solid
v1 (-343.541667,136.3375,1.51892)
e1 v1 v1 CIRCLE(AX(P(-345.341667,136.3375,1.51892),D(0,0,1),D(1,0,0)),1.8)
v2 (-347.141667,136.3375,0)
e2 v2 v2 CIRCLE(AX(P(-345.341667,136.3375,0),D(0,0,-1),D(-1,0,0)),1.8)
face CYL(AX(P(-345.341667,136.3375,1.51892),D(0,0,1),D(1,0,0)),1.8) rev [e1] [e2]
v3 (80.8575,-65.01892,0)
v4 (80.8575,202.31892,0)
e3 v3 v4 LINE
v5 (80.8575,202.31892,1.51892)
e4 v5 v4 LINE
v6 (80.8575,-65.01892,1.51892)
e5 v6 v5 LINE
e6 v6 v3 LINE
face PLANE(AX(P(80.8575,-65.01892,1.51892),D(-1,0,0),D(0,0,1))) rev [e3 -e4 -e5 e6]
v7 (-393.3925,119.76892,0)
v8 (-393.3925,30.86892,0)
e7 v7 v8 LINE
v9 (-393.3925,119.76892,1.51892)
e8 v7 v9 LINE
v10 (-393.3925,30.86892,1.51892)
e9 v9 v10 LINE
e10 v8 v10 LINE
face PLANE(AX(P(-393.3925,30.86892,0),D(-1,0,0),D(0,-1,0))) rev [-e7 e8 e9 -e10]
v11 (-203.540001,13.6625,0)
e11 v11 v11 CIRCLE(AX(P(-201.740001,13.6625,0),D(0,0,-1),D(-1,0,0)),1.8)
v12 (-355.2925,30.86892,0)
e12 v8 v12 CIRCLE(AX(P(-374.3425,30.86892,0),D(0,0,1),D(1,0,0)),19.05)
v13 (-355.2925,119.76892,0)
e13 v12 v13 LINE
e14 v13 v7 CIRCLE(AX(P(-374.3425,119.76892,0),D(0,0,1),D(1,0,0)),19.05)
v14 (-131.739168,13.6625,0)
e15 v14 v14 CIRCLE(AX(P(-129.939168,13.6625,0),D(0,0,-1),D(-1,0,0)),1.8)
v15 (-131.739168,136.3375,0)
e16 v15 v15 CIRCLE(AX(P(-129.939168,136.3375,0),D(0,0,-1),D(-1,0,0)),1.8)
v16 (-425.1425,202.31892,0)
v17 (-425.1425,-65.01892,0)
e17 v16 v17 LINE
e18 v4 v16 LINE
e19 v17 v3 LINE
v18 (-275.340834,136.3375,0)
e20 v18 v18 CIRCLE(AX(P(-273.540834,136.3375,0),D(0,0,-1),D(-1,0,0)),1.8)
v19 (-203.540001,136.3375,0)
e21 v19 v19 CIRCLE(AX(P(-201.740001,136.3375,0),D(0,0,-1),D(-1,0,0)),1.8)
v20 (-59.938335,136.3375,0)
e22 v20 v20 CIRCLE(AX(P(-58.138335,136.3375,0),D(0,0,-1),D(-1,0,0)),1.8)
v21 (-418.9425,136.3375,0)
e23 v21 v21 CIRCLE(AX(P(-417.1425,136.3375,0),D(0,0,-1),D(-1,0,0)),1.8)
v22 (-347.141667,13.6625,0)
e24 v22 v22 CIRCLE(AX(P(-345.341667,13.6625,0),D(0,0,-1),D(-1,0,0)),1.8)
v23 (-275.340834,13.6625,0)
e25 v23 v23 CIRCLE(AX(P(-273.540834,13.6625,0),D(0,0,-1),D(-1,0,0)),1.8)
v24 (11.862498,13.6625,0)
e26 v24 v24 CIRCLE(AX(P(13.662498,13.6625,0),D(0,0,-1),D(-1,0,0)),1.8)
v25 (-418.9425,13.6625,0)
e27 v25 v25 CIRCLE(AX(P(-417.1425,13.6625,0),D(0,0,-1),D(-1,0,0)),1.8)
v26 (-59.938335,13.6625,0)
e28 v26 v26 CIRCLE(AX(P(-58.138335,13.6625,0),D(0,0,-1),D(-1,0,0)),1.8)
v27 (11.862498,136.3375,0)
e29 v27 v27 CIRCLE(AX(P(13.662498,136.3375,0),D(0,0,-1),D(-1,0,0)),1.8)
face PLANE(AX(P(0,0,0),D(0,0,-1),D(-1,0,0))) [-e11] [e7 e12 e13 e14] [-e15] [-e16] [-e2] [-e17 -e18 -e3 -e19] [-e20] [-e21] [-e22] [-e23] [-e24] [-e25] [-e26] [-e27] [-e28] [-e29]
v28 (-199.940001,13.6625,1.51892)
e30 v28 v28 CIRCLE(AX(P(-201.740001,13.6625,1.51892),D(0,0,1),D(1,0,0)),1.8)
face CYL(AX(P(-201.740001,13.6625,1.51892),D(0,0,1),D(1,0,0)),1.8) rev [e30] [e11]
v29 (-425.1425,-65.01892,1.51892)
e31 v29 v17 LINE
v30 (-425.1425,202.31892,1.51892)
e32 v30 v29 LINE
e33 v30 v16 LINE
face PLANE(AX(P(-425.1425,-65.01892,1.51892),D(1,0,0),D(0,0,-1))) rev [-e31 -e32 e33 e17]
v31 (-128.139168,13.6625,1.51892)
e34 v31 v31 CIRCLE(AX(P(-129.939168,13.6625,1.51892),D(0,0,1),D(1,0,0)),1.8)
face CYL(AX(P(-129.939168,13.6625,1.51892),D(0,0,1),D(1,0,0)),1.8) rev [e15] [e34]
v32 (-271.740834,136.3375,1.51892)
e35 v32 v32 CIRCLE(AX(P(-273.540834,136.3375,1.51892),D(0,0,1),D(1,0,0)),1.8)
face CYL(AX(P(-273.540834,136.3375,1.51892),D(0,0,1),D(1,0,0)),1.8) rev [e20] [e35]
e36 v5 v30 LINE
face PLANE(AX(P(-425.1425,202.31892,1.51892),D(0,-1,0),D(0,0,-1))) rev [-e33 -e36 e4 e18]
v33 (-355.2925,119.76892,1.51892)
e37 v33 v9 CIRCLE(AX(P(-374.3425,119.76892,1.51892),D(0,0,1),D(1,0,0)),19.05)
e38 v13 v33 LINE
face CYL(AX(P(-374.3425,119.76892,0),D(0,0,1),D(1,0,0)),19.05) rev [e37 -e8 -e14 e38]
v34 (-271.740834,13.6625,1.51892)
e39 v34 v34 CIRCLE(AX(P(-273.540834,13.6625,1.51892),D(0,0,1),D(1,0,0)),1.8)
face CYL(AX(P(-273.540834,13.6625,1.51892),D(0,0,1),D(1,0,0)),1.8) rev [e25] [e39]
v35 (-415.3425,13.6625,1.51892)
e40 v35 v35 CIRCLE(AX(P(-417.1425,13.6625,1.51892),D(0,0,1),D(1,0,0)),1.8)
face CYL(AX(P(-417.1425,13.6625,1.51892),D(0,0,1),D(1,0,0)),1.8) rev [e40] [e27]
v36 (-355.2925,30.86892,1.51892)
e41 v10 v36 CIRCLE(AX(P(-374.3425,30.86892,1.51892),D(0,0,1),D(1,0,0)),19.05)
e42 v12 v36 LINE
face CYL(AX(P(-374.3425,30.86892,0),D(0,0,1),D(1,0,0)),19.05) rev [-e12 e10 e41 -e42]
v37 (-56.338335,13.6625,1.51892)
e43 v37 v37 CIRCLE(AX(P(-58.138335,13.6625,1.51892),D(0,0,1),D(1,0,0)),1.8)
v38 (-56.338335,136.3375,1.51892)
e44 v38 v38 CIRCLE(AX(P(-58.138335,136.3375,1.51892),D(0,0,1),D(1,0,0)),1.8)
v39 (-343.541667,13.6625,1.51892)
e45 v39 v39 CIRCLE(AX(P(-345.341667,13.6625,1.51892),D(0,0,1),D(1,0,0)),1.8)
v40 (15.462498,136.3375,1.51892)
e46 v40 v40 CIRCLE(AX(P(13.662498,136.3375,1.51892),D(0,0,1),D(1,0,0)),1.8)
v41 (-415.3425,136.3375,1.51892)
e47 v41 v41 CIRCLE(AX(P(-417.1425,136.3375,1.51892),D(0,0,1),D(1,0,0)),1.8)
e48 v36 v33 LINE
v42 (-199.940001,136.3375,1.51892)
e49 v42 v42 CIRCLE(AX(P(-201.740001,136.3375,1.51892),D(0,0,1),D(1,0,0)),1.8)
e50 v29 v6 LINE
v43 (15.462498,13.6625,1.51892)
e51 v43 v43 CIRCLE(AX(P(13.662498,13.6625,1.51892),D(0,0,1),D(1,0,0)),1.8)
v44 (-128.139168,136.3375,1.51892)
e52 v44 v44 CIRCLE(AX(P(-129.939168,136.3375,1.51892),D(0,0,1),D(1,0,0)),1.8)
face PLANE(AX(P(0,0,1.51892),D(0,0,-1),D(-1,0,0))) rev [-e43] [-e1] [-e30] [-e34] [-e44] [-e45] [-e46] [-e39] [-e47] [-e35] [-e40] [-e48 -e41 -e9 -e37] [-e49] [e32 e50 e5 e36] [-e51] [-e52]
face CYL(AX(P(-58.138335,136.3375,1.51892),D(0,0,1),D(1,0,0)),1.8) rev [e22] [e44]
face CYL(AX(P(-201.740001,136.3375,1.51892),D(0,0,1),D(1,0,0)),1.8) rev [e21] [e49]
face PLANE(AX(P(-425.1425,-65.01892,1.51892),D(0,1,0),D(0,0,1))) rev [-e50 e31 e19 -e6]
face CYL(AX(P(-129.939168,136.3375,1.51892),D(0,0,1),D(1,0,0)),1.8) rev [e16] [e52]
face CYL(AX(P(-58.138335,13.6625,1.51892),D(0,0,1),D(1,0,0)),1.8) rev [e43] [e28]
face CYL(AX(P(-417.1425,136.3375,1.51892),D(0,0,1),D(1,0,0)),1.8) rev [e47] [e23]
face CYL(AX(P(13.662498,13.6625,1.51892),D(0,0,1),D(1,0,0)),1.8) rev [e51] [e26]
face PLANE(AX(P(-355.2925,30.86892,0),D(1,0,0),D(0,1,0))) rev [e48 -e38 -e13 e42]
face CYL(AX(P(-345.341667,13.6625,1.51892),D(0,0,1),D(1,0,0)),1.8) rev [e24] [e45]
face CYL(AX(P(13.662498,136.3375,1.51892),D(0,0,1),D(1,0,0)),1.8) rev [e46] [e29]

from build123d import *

# Parameters (mm, degrees)
SKETCH1_W                = 506
SKETCH1_H                = 267.33784
BASE_FLANGE1_DEPTH       = 1.51892
CUT_EXTRUDE1_DEPTH       = 2.54
M3_CLEARANCE_HOLE1_D     = 3.6
M3_CLEARANCE_HOLE1_DEPTH = 11.938
M3_CLEARANCE_HOLE1_TIP   = 1.081549114


# Sheet-metal steps are written as plain solids
with BuildPart() as part:
    # Sketch1 → Base-Flange1 (new body)
    with BuildSketch(Plane.XY):
        with Locations((-172.1425, 68.65)):
            Rectangle(SKETCH1_W, SKETCH1_H)
    extrude(amount=BASE_FLANGE1_DEPTH)

    # Sketch6 → Cut-Extrude1 (cut)
    with BuildSketch(Plane.XY.offset(1.51892)):
        with BuildLine():
            Line((-393.3925, 30.86892), (-393.3925, 119.76892))
            ThreePointArc((-393.3925, 119.76892), (-374.3425, 138.81892), (-355.2925, 119.76892))
            Line((-355.2925, 119.76892), (-355.2925, 30.86892))
            ThreePointArc((-355.2925, 30.86892), (-374.3425, 11.81892), (-393.3925, 30.86892))
        make_face()
    extrude(amount=-CUT_EXTRUDE1_DEPTH, mode=Mode.SUBTRACT)

    # M3 Clearance Hole1
    with Locations(Plane.XY.offset(1.51892)):
        with Locations((-417.1425, 136.3375), (-417.1425, 13.6625), (-345.341667, 136.3375), (-345.341667, 13.6625), (-273.540834, 136.3375), (-273.540834, 13.6625), (-201.740001, 136.3375), (-201.740001, 13.6625), (-129.939168, 136.3375), (-129.939168, 13.6625), (-58.138335, 136.3375), (-58.138335, 13.6625), (13.662498, 136.3375), (13.662498, 13.6625)):
            Hole(M3_CLEARANCE_HOLE1_D / 2, depth=M3_CLEARANCE_HOLE1_DEPTH)
            with Locations((0, 0, -(M3_CLEARANCE_HOLE1_DEPTH + M3_CLEARANCE_HOLE1_TIP / 2))):  # 118° drill point
                Cone(0, M3_CLEARANCE_HOLE1_D / 2, M3_CLEARANCE_HOLE1_TIP, mode=Mode.SUBTRACT)


solid = part.part
